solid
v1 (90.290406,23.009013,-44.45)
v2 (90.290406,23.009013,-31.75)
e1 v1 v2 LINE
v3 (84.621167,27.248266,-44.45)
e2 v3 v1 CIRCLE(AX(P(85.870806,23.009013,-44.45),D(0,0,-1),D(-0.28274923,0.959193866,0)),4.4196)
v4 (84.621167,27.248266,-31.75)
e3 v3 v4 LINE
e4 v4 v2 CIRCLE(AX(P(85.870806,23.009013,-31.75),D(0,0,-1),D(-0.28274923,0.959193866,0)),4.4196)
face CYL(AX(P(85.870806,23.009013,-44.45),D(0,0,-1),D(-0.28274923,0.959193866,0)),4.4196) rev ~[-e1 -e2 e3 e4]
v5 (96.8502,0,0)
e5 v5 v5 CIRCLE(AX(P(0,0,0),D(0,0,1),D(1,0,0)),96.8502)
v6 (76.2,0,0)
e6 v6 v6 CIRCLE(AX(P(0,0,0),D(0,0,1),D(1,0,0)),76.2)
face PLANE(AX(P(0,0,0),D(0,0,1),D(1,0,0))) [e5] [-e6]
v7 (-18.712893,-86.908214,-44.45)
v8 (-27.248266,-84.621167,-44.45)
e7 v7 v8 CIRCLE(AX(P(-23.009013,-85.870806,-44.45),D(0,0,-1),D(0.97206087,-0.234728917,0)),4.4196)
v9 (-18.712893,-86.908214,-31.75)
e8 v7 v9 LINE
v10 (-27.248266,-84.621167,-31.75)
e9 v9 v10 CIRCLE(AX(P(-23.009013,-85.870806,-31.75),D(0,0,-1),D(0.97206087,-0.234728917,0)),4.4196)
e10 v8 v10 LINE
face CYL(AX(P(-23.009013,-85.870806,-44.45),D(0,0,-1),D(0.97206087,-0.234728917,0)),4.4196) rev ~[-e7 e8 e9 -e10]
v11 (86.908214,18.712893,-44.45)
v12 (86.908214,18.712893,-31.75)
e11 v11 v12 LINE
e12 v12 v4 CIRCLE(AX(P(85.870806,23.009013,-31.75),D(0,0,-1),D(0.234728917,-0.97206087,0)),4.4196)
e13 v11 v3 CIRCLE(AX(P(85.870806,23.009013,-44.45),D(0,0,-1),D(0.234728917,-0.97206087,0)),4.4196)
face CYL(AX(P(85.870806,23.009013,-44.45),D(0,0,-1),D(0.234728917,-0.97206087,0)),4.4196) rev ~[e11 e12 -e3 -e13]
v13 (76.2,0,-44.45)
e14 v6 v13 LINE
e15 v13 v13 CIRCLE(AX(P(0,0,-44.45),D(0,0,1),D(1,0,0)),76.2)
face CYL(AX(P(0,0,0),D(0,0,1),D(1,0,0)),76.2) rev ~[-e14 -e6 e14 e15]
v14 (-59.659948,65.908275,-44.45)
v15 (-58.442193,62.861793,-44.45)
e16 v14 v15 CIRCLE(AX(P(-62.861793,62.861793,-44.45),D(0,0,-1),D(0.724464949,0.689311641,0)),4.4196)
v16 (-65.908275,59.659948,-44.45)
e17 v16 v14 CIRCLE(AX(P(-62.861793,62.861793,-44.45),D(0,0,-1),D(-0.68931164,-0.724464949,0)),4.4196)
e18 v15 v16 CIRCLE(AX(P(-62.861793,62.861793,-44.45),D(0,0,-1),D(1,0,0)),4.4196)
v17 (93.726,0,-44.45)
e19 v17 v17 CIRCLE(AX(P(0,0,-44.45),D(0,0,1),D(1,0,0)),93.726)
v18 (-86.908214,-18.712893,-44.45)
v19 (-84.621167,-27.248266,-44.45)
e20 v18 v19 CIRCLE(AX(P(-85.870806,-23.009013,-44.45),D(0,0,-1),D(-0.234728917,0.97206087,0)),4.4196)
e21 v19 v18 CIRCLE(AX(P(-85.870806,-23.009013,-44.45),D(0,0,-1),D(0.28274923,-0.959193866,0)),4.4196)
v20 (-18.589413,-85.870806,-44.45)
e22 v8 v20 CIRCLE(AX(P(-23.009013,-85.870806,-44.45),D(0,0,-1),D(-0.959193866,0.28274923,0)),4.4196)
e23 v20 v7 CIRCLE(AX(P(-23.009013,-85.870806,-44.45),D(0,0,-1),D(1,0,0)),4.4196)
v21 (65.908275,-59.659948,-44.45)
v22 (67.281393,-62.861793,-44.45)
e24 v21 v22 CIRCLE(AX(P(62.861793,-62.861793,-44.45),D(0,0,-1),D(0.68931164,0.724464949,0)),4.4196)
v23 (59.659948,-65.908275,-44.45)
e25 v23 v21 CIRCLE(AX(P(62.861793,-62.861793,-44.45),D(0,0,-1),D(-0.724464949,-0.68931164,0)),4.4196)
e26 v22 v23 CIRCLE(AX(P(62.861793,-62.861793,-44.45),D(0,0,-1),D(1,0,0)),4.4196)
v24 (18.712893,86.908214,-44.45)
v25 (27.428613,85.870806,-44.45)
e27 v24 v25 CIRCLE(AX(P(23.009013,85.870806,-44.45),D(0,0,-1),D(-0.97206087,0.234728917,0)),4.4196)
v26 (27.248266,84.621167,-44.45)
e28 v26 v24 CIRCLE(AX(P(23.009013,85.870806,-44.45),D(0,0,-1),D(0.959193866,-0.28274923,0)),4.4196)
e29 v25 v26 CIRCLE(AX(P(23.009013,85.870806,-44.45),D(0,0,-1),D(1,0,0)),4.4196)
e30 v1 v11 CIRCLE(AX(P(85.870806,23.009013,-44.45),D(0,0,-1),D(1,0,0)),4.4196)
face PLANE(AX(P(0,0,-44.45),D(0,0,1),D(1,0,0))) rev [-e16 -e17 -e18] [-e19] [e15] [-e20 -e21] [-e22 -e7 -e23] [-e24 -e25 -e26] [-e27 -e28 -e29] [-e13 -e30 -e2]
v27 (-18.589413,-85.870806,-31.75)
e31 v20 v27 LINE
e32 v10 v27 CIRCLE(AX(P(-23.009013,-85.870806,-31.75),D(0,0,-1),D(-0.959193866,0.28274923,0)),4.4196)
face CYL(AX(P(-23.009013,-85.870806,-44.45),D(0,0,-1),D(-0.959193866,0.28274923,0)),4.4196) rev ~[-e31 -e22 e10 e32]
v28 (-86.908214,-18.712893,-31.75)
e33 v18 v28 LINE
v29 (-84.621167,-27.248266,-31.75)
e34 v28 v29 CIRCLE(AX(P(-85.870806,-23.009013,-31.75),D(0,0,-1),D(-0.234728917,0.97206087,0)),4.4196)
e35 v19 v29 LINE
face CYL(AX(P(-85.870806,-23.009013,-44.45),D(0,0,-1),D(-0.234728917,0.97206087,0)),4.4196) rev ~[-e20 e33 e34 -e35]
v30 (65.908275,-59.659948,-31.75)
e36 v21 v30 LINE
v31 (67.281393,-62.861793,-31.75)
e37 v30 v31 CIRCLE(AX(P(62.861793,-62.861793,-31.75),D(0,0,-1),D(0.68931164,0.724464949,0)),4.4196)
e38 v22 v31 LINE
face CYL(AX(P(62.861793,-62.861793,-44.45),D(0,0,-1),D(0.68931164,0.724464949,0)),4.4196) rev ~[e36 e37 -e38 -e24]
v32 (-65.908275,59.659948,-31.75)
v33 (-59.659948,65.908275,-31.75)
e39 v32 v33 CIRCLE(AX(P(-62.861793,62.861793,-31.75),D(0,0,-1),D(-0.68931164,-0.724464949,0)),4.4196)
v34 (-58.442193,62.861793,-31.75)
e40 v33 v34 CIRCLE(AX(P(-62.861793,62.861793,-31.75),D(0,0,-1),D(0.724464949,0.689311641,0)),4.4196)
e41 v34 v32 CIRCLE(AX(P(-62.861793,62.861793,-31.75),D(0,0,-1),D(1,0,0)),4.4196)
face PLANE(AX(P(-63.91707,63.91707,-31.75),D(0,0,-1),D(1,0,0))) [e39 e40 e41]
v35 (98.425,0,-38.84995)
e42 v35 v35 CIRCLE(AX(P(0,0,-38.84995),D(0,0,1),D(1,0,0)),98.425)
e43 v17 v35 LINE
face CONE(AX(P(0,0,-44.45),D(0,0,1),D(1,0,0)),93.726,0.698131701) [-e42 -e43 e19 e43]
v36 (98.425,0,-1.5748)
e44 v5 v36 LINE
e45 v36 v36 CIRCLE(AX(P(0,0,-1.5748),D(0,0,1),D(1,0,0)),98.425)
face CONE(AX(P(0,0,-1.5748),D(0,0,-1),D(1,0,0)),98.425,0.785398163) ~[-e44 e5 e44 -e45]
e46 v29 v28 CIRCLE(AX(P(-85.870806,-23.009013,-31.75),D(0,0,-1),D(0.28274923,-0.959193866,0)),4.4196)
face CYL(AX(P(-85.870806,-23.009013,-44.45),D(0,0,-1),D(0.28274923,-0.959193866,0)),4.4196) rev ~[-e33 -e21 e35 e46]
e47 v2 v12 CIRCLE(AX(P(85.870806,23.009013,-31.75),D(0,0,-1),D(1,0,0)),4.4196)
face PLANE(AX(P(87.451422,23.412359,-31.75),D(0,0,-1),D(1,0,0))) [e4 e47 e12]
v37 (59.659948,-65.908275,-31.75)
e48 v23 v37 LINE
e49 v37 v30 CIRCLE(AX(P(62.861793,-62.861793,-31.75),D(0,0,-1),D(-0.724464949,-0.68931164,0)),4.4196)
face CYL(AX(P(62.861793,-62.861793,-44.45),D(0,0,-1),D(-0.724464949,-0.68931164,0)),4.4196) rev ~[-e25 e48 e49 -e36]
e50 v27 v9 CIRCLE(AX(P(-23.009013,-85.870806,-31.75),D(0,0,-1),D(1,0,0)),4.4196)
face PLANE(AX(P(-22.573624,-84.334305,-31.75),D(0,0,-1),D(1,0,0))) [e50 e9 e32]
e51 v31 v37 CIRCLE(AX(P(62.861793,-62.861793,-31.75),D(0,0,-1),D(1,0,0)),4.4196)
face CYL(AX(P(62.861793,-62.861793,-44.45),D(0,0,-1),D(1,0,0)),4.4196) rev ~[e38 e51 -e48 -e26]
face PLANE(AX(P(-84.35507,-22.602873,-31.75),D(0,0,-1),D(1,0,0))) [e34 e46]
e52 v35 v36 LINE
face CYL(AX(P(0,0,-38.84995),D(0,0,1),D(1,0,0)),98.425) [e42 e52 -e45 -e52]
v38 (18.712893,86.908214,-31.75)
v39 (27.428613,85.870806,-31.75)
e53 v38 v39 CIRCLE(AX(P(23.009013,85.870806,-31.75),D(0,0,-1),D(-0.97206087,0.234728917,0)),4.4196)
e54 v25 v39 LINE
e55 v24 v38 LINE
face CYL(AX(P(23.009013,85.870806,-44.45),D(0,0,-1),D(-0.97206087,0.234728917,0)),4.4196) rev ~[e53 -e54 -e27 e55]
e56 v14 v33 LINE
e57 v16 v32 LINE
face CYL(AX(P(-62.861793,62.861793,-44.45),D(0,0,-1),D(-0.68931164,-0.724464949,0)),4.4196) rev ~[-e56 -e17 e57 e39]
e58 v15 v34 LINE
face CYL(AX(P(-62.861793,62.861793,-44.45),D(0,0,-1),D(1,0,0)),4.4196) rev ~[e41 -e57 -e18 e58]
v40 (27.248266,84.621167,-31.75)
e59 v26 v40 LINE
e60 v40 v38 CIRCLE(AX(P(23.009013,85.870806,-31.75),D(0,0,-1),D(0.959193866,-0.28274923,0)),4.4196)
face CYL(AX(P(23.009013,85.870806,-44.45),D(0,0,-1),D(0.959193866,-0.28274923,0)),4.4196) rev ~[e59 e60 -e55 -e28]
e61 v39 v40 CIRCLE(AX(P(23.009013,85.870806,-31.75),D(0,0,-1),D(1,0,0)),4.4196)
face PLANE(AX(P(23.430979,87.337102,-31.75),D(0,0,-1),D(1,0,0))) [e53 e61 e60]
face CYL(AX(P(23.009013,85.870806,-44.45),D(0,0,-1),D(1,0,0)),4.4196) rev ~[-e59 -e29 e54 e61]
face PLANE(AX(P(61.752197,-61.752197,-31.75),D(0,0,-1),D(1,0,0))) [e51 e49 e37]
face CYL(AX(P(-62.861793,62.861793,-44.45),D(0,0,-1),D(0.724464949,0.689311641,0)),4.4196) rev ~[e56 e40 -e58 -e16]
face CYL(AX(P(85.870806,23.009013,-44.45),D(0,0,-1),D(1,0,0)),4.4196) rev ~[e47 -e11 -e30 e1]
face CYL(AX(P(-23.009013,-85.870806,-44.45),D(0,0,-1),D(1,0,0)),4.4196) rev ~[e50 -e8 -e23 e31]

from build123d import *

# Parameters (mm, degrees)
F2_SIZE2 = 1.5748
F2_SIZE  = 1.5748
F4_DEPTH = 12.7
F5_R     = 76.2
F6_DEPTH = 44.451


with BuildPart() as f1:
    # F0 (on Front) → F1 (revolve)
    with BuildSketch(Plane.XZ):
        Polygon((98.425, 0), (0, 0), (0, -44.45), (93.726, -44.45), (98.425, -38.8499498684), align=None)
    revolve(axis=Axis((0, 0, -22.225), (0, 0, 1)))

    # F2
    f2_edges = [f1.edges().sort_by_distance(p)[0] for p in [
        (-98.425, 0, 0),
    ]]
    chamfer(f2_edges, length=F2_SIZE, length2=F2_SIZE2)

    # F3 (on face) → F4 (cut)
    with BuildSketch(Plane(origin=(0, 0, -44.45), x_dir=(1, 0, 0), z_dir=(0, 0, -1))):
        with BuildLine():
            ThreePointArc((59.6599475589, 65.9082745736), (59.7366637174, 59.7366637174), (65.9082745736, 59.6599475589))
            ThreePointArc((65.9082745736, 59.6599475589), (62.8617928475, 62.8617928475), (59.6599475589, 65.9082745736))
        make_face()
        with BuildLine():
            ThreePointArc((59.6599475589, 65.9082745736), (62.8617928475, 62.8617928475), (65.9082745736, 59.6599475589))
            ThreePointArc((65.9082745736, 59.6599475589), (66.923633243, 61.1198638129), (67.2813928475, 62.8617928475))
            ThreePointArc((67.2813928475, 62.8617928475), (64.5022179025, 66.9656775679), (59.6599475589, 65.9082745736))
        make_face()
        with BuildLine():
            ThreePointArc((90.2904059571, -23.0090131096), (89.343398088, -20.275157215), (86.9082138798, -18.7128928876))
            ThreePointArc((86.9082138798, -18.7128928876), (85.8708059571, -23.0090131096), (84.6211674612, -27.2482663209))
            ThreePointArc((84.6211674612, -27.2482663209), (88.5174984084, -26.5484881029), (90.2904059571, -23.0090131096))
        make_face()
        with BuildLine():
            ThreePointArc((84.6211674612, -27.2482663209), (85.8708059571, -23.0090131096), (86.9082138798, -18.7128928876))
            ThreePointArc((86.9082138798, -18.7128928876), (81.6018001752, -21.8651364579), (84.6211674612, -27.2482663209))
        make_face()
        with BuildLine():
            ThreePointArc((-18.5894131096, 85.8708059571), (-18.6203916237, 86.3931713593), (-18.7128928876, 86.9082138798))
            ThreePointArc((-18.7128928876, 86.9082138798), (-23.0090131096, 85.8708059571), (-27.2482663209, 84.6211674612))
            ThreePointArc((-27.2482663209, 84.6211674612), (-22.3777205201, 81.4965250075), (-18.5894131096, 85.8708059571))
        make_face()
        with BuildLine():
            ThreePointArc((-27.2482663209, 84.6211674612), (-23.0090131096, 85.8708059571), (-18.7128928876, 86.9082138798))
            ThreePointArc((-18.7128928876, 86.9082138798), (-24.1528897613, 90.139811739), (-27.2482663209, 84.6211674612))
        make_face()
        with BuildLine():
            ThreePointArc((27.4286131096, -85.8708059571), (27.3832940593, -85.2395133675), (27.2482663209, -84.6211674612))
            ThreePointArc((27.2482663209, -84.6211674612), (23.0090131096, -85.8708059571), (18.7128928876, -86.9082138798))
            ThreePointArc((18.7128928876, -86.9082138798), (23.5313785118, -90.259427443), (27.4286131096, -85.8708059571))
        make_face()
        with BuildLine():
            ThreePointArc((18.7128928876, -86.9082138798), (23.0090131096, -85.8708059571), (27.2482663209, -84.6211674612))
            ThreePointArc((27.2482663209, -84.6211674612), (21.8651364579, -81.6018001752), (18.7128928876, -86.9082138798))
        make_face()
        with BuildLine():
            ThreePointArc((-81.4512059571, 23.0090131096), (-82.3313309638, 25.6557055609), (-84.6211674612, 27.2482663209))
            ThreePointArc((-84.6211674612, 27.2482663209), (-85.8708059571, 23.0090131096), (-86.9082138798, 18.7128928876))
            ThreePointArc((-86.9082138798, 18.7128928876), (-83.1369500625, 19.5364209787), (-81.4512059571, 23.0090131096))
        make_face()
        with BuildLine():
            ThreePointArc((-86.9082138798, 18.7128928876), (-85.8708059571, 23.0090131096), (-84.6211674612, 27.2482663209))
            ThreePointArc((-84.6211674612, 27.2482663209), (-90.139811739, 24.1528897613), (-86.9082138798, 18.7128928876))
        make_face()
        with BuildLine():
            ThreePointArc((-65.9082745736, -59.6599475589), (-65.9869219776, -65.9869219776), (-59.6599475589, -65.9082745736))
            ThreePointArc((-59.6599475589, -65.9082745736), (-62.8617928475, -62.8617928475), (-65.9082745736, -59.6599475589))
        make_face()
        with BuildLine():
            ThreePointArc((-65.9082745736, -59.6599475589), (-62.8617928475, -62.8617928475), (-59.6599475589, -65.9082745736))
            ThreePointArc((-59.6599475589, -65.9082745736), (-58.757908127, -64.5022179025), (-58.4421928475, -62.8617928475))
            ThreePointArc((-58.4421928475, -62.8617928475), (-61.1198638129, -58.799952452), (-65.9082745736, -59.6599475589))
        make_face()
    extrude(amount=-F4_DEPTH, mode=Mode.SUBTRACT)

    # F5 (on face) → F6 (cut, through all)
    with BuildSketch(Plane.XY):
        Circle(F5_R)
    extrude(amount=-F6_DEPTH, mode=Mode.SUBTRACT)


solid = f1.part
